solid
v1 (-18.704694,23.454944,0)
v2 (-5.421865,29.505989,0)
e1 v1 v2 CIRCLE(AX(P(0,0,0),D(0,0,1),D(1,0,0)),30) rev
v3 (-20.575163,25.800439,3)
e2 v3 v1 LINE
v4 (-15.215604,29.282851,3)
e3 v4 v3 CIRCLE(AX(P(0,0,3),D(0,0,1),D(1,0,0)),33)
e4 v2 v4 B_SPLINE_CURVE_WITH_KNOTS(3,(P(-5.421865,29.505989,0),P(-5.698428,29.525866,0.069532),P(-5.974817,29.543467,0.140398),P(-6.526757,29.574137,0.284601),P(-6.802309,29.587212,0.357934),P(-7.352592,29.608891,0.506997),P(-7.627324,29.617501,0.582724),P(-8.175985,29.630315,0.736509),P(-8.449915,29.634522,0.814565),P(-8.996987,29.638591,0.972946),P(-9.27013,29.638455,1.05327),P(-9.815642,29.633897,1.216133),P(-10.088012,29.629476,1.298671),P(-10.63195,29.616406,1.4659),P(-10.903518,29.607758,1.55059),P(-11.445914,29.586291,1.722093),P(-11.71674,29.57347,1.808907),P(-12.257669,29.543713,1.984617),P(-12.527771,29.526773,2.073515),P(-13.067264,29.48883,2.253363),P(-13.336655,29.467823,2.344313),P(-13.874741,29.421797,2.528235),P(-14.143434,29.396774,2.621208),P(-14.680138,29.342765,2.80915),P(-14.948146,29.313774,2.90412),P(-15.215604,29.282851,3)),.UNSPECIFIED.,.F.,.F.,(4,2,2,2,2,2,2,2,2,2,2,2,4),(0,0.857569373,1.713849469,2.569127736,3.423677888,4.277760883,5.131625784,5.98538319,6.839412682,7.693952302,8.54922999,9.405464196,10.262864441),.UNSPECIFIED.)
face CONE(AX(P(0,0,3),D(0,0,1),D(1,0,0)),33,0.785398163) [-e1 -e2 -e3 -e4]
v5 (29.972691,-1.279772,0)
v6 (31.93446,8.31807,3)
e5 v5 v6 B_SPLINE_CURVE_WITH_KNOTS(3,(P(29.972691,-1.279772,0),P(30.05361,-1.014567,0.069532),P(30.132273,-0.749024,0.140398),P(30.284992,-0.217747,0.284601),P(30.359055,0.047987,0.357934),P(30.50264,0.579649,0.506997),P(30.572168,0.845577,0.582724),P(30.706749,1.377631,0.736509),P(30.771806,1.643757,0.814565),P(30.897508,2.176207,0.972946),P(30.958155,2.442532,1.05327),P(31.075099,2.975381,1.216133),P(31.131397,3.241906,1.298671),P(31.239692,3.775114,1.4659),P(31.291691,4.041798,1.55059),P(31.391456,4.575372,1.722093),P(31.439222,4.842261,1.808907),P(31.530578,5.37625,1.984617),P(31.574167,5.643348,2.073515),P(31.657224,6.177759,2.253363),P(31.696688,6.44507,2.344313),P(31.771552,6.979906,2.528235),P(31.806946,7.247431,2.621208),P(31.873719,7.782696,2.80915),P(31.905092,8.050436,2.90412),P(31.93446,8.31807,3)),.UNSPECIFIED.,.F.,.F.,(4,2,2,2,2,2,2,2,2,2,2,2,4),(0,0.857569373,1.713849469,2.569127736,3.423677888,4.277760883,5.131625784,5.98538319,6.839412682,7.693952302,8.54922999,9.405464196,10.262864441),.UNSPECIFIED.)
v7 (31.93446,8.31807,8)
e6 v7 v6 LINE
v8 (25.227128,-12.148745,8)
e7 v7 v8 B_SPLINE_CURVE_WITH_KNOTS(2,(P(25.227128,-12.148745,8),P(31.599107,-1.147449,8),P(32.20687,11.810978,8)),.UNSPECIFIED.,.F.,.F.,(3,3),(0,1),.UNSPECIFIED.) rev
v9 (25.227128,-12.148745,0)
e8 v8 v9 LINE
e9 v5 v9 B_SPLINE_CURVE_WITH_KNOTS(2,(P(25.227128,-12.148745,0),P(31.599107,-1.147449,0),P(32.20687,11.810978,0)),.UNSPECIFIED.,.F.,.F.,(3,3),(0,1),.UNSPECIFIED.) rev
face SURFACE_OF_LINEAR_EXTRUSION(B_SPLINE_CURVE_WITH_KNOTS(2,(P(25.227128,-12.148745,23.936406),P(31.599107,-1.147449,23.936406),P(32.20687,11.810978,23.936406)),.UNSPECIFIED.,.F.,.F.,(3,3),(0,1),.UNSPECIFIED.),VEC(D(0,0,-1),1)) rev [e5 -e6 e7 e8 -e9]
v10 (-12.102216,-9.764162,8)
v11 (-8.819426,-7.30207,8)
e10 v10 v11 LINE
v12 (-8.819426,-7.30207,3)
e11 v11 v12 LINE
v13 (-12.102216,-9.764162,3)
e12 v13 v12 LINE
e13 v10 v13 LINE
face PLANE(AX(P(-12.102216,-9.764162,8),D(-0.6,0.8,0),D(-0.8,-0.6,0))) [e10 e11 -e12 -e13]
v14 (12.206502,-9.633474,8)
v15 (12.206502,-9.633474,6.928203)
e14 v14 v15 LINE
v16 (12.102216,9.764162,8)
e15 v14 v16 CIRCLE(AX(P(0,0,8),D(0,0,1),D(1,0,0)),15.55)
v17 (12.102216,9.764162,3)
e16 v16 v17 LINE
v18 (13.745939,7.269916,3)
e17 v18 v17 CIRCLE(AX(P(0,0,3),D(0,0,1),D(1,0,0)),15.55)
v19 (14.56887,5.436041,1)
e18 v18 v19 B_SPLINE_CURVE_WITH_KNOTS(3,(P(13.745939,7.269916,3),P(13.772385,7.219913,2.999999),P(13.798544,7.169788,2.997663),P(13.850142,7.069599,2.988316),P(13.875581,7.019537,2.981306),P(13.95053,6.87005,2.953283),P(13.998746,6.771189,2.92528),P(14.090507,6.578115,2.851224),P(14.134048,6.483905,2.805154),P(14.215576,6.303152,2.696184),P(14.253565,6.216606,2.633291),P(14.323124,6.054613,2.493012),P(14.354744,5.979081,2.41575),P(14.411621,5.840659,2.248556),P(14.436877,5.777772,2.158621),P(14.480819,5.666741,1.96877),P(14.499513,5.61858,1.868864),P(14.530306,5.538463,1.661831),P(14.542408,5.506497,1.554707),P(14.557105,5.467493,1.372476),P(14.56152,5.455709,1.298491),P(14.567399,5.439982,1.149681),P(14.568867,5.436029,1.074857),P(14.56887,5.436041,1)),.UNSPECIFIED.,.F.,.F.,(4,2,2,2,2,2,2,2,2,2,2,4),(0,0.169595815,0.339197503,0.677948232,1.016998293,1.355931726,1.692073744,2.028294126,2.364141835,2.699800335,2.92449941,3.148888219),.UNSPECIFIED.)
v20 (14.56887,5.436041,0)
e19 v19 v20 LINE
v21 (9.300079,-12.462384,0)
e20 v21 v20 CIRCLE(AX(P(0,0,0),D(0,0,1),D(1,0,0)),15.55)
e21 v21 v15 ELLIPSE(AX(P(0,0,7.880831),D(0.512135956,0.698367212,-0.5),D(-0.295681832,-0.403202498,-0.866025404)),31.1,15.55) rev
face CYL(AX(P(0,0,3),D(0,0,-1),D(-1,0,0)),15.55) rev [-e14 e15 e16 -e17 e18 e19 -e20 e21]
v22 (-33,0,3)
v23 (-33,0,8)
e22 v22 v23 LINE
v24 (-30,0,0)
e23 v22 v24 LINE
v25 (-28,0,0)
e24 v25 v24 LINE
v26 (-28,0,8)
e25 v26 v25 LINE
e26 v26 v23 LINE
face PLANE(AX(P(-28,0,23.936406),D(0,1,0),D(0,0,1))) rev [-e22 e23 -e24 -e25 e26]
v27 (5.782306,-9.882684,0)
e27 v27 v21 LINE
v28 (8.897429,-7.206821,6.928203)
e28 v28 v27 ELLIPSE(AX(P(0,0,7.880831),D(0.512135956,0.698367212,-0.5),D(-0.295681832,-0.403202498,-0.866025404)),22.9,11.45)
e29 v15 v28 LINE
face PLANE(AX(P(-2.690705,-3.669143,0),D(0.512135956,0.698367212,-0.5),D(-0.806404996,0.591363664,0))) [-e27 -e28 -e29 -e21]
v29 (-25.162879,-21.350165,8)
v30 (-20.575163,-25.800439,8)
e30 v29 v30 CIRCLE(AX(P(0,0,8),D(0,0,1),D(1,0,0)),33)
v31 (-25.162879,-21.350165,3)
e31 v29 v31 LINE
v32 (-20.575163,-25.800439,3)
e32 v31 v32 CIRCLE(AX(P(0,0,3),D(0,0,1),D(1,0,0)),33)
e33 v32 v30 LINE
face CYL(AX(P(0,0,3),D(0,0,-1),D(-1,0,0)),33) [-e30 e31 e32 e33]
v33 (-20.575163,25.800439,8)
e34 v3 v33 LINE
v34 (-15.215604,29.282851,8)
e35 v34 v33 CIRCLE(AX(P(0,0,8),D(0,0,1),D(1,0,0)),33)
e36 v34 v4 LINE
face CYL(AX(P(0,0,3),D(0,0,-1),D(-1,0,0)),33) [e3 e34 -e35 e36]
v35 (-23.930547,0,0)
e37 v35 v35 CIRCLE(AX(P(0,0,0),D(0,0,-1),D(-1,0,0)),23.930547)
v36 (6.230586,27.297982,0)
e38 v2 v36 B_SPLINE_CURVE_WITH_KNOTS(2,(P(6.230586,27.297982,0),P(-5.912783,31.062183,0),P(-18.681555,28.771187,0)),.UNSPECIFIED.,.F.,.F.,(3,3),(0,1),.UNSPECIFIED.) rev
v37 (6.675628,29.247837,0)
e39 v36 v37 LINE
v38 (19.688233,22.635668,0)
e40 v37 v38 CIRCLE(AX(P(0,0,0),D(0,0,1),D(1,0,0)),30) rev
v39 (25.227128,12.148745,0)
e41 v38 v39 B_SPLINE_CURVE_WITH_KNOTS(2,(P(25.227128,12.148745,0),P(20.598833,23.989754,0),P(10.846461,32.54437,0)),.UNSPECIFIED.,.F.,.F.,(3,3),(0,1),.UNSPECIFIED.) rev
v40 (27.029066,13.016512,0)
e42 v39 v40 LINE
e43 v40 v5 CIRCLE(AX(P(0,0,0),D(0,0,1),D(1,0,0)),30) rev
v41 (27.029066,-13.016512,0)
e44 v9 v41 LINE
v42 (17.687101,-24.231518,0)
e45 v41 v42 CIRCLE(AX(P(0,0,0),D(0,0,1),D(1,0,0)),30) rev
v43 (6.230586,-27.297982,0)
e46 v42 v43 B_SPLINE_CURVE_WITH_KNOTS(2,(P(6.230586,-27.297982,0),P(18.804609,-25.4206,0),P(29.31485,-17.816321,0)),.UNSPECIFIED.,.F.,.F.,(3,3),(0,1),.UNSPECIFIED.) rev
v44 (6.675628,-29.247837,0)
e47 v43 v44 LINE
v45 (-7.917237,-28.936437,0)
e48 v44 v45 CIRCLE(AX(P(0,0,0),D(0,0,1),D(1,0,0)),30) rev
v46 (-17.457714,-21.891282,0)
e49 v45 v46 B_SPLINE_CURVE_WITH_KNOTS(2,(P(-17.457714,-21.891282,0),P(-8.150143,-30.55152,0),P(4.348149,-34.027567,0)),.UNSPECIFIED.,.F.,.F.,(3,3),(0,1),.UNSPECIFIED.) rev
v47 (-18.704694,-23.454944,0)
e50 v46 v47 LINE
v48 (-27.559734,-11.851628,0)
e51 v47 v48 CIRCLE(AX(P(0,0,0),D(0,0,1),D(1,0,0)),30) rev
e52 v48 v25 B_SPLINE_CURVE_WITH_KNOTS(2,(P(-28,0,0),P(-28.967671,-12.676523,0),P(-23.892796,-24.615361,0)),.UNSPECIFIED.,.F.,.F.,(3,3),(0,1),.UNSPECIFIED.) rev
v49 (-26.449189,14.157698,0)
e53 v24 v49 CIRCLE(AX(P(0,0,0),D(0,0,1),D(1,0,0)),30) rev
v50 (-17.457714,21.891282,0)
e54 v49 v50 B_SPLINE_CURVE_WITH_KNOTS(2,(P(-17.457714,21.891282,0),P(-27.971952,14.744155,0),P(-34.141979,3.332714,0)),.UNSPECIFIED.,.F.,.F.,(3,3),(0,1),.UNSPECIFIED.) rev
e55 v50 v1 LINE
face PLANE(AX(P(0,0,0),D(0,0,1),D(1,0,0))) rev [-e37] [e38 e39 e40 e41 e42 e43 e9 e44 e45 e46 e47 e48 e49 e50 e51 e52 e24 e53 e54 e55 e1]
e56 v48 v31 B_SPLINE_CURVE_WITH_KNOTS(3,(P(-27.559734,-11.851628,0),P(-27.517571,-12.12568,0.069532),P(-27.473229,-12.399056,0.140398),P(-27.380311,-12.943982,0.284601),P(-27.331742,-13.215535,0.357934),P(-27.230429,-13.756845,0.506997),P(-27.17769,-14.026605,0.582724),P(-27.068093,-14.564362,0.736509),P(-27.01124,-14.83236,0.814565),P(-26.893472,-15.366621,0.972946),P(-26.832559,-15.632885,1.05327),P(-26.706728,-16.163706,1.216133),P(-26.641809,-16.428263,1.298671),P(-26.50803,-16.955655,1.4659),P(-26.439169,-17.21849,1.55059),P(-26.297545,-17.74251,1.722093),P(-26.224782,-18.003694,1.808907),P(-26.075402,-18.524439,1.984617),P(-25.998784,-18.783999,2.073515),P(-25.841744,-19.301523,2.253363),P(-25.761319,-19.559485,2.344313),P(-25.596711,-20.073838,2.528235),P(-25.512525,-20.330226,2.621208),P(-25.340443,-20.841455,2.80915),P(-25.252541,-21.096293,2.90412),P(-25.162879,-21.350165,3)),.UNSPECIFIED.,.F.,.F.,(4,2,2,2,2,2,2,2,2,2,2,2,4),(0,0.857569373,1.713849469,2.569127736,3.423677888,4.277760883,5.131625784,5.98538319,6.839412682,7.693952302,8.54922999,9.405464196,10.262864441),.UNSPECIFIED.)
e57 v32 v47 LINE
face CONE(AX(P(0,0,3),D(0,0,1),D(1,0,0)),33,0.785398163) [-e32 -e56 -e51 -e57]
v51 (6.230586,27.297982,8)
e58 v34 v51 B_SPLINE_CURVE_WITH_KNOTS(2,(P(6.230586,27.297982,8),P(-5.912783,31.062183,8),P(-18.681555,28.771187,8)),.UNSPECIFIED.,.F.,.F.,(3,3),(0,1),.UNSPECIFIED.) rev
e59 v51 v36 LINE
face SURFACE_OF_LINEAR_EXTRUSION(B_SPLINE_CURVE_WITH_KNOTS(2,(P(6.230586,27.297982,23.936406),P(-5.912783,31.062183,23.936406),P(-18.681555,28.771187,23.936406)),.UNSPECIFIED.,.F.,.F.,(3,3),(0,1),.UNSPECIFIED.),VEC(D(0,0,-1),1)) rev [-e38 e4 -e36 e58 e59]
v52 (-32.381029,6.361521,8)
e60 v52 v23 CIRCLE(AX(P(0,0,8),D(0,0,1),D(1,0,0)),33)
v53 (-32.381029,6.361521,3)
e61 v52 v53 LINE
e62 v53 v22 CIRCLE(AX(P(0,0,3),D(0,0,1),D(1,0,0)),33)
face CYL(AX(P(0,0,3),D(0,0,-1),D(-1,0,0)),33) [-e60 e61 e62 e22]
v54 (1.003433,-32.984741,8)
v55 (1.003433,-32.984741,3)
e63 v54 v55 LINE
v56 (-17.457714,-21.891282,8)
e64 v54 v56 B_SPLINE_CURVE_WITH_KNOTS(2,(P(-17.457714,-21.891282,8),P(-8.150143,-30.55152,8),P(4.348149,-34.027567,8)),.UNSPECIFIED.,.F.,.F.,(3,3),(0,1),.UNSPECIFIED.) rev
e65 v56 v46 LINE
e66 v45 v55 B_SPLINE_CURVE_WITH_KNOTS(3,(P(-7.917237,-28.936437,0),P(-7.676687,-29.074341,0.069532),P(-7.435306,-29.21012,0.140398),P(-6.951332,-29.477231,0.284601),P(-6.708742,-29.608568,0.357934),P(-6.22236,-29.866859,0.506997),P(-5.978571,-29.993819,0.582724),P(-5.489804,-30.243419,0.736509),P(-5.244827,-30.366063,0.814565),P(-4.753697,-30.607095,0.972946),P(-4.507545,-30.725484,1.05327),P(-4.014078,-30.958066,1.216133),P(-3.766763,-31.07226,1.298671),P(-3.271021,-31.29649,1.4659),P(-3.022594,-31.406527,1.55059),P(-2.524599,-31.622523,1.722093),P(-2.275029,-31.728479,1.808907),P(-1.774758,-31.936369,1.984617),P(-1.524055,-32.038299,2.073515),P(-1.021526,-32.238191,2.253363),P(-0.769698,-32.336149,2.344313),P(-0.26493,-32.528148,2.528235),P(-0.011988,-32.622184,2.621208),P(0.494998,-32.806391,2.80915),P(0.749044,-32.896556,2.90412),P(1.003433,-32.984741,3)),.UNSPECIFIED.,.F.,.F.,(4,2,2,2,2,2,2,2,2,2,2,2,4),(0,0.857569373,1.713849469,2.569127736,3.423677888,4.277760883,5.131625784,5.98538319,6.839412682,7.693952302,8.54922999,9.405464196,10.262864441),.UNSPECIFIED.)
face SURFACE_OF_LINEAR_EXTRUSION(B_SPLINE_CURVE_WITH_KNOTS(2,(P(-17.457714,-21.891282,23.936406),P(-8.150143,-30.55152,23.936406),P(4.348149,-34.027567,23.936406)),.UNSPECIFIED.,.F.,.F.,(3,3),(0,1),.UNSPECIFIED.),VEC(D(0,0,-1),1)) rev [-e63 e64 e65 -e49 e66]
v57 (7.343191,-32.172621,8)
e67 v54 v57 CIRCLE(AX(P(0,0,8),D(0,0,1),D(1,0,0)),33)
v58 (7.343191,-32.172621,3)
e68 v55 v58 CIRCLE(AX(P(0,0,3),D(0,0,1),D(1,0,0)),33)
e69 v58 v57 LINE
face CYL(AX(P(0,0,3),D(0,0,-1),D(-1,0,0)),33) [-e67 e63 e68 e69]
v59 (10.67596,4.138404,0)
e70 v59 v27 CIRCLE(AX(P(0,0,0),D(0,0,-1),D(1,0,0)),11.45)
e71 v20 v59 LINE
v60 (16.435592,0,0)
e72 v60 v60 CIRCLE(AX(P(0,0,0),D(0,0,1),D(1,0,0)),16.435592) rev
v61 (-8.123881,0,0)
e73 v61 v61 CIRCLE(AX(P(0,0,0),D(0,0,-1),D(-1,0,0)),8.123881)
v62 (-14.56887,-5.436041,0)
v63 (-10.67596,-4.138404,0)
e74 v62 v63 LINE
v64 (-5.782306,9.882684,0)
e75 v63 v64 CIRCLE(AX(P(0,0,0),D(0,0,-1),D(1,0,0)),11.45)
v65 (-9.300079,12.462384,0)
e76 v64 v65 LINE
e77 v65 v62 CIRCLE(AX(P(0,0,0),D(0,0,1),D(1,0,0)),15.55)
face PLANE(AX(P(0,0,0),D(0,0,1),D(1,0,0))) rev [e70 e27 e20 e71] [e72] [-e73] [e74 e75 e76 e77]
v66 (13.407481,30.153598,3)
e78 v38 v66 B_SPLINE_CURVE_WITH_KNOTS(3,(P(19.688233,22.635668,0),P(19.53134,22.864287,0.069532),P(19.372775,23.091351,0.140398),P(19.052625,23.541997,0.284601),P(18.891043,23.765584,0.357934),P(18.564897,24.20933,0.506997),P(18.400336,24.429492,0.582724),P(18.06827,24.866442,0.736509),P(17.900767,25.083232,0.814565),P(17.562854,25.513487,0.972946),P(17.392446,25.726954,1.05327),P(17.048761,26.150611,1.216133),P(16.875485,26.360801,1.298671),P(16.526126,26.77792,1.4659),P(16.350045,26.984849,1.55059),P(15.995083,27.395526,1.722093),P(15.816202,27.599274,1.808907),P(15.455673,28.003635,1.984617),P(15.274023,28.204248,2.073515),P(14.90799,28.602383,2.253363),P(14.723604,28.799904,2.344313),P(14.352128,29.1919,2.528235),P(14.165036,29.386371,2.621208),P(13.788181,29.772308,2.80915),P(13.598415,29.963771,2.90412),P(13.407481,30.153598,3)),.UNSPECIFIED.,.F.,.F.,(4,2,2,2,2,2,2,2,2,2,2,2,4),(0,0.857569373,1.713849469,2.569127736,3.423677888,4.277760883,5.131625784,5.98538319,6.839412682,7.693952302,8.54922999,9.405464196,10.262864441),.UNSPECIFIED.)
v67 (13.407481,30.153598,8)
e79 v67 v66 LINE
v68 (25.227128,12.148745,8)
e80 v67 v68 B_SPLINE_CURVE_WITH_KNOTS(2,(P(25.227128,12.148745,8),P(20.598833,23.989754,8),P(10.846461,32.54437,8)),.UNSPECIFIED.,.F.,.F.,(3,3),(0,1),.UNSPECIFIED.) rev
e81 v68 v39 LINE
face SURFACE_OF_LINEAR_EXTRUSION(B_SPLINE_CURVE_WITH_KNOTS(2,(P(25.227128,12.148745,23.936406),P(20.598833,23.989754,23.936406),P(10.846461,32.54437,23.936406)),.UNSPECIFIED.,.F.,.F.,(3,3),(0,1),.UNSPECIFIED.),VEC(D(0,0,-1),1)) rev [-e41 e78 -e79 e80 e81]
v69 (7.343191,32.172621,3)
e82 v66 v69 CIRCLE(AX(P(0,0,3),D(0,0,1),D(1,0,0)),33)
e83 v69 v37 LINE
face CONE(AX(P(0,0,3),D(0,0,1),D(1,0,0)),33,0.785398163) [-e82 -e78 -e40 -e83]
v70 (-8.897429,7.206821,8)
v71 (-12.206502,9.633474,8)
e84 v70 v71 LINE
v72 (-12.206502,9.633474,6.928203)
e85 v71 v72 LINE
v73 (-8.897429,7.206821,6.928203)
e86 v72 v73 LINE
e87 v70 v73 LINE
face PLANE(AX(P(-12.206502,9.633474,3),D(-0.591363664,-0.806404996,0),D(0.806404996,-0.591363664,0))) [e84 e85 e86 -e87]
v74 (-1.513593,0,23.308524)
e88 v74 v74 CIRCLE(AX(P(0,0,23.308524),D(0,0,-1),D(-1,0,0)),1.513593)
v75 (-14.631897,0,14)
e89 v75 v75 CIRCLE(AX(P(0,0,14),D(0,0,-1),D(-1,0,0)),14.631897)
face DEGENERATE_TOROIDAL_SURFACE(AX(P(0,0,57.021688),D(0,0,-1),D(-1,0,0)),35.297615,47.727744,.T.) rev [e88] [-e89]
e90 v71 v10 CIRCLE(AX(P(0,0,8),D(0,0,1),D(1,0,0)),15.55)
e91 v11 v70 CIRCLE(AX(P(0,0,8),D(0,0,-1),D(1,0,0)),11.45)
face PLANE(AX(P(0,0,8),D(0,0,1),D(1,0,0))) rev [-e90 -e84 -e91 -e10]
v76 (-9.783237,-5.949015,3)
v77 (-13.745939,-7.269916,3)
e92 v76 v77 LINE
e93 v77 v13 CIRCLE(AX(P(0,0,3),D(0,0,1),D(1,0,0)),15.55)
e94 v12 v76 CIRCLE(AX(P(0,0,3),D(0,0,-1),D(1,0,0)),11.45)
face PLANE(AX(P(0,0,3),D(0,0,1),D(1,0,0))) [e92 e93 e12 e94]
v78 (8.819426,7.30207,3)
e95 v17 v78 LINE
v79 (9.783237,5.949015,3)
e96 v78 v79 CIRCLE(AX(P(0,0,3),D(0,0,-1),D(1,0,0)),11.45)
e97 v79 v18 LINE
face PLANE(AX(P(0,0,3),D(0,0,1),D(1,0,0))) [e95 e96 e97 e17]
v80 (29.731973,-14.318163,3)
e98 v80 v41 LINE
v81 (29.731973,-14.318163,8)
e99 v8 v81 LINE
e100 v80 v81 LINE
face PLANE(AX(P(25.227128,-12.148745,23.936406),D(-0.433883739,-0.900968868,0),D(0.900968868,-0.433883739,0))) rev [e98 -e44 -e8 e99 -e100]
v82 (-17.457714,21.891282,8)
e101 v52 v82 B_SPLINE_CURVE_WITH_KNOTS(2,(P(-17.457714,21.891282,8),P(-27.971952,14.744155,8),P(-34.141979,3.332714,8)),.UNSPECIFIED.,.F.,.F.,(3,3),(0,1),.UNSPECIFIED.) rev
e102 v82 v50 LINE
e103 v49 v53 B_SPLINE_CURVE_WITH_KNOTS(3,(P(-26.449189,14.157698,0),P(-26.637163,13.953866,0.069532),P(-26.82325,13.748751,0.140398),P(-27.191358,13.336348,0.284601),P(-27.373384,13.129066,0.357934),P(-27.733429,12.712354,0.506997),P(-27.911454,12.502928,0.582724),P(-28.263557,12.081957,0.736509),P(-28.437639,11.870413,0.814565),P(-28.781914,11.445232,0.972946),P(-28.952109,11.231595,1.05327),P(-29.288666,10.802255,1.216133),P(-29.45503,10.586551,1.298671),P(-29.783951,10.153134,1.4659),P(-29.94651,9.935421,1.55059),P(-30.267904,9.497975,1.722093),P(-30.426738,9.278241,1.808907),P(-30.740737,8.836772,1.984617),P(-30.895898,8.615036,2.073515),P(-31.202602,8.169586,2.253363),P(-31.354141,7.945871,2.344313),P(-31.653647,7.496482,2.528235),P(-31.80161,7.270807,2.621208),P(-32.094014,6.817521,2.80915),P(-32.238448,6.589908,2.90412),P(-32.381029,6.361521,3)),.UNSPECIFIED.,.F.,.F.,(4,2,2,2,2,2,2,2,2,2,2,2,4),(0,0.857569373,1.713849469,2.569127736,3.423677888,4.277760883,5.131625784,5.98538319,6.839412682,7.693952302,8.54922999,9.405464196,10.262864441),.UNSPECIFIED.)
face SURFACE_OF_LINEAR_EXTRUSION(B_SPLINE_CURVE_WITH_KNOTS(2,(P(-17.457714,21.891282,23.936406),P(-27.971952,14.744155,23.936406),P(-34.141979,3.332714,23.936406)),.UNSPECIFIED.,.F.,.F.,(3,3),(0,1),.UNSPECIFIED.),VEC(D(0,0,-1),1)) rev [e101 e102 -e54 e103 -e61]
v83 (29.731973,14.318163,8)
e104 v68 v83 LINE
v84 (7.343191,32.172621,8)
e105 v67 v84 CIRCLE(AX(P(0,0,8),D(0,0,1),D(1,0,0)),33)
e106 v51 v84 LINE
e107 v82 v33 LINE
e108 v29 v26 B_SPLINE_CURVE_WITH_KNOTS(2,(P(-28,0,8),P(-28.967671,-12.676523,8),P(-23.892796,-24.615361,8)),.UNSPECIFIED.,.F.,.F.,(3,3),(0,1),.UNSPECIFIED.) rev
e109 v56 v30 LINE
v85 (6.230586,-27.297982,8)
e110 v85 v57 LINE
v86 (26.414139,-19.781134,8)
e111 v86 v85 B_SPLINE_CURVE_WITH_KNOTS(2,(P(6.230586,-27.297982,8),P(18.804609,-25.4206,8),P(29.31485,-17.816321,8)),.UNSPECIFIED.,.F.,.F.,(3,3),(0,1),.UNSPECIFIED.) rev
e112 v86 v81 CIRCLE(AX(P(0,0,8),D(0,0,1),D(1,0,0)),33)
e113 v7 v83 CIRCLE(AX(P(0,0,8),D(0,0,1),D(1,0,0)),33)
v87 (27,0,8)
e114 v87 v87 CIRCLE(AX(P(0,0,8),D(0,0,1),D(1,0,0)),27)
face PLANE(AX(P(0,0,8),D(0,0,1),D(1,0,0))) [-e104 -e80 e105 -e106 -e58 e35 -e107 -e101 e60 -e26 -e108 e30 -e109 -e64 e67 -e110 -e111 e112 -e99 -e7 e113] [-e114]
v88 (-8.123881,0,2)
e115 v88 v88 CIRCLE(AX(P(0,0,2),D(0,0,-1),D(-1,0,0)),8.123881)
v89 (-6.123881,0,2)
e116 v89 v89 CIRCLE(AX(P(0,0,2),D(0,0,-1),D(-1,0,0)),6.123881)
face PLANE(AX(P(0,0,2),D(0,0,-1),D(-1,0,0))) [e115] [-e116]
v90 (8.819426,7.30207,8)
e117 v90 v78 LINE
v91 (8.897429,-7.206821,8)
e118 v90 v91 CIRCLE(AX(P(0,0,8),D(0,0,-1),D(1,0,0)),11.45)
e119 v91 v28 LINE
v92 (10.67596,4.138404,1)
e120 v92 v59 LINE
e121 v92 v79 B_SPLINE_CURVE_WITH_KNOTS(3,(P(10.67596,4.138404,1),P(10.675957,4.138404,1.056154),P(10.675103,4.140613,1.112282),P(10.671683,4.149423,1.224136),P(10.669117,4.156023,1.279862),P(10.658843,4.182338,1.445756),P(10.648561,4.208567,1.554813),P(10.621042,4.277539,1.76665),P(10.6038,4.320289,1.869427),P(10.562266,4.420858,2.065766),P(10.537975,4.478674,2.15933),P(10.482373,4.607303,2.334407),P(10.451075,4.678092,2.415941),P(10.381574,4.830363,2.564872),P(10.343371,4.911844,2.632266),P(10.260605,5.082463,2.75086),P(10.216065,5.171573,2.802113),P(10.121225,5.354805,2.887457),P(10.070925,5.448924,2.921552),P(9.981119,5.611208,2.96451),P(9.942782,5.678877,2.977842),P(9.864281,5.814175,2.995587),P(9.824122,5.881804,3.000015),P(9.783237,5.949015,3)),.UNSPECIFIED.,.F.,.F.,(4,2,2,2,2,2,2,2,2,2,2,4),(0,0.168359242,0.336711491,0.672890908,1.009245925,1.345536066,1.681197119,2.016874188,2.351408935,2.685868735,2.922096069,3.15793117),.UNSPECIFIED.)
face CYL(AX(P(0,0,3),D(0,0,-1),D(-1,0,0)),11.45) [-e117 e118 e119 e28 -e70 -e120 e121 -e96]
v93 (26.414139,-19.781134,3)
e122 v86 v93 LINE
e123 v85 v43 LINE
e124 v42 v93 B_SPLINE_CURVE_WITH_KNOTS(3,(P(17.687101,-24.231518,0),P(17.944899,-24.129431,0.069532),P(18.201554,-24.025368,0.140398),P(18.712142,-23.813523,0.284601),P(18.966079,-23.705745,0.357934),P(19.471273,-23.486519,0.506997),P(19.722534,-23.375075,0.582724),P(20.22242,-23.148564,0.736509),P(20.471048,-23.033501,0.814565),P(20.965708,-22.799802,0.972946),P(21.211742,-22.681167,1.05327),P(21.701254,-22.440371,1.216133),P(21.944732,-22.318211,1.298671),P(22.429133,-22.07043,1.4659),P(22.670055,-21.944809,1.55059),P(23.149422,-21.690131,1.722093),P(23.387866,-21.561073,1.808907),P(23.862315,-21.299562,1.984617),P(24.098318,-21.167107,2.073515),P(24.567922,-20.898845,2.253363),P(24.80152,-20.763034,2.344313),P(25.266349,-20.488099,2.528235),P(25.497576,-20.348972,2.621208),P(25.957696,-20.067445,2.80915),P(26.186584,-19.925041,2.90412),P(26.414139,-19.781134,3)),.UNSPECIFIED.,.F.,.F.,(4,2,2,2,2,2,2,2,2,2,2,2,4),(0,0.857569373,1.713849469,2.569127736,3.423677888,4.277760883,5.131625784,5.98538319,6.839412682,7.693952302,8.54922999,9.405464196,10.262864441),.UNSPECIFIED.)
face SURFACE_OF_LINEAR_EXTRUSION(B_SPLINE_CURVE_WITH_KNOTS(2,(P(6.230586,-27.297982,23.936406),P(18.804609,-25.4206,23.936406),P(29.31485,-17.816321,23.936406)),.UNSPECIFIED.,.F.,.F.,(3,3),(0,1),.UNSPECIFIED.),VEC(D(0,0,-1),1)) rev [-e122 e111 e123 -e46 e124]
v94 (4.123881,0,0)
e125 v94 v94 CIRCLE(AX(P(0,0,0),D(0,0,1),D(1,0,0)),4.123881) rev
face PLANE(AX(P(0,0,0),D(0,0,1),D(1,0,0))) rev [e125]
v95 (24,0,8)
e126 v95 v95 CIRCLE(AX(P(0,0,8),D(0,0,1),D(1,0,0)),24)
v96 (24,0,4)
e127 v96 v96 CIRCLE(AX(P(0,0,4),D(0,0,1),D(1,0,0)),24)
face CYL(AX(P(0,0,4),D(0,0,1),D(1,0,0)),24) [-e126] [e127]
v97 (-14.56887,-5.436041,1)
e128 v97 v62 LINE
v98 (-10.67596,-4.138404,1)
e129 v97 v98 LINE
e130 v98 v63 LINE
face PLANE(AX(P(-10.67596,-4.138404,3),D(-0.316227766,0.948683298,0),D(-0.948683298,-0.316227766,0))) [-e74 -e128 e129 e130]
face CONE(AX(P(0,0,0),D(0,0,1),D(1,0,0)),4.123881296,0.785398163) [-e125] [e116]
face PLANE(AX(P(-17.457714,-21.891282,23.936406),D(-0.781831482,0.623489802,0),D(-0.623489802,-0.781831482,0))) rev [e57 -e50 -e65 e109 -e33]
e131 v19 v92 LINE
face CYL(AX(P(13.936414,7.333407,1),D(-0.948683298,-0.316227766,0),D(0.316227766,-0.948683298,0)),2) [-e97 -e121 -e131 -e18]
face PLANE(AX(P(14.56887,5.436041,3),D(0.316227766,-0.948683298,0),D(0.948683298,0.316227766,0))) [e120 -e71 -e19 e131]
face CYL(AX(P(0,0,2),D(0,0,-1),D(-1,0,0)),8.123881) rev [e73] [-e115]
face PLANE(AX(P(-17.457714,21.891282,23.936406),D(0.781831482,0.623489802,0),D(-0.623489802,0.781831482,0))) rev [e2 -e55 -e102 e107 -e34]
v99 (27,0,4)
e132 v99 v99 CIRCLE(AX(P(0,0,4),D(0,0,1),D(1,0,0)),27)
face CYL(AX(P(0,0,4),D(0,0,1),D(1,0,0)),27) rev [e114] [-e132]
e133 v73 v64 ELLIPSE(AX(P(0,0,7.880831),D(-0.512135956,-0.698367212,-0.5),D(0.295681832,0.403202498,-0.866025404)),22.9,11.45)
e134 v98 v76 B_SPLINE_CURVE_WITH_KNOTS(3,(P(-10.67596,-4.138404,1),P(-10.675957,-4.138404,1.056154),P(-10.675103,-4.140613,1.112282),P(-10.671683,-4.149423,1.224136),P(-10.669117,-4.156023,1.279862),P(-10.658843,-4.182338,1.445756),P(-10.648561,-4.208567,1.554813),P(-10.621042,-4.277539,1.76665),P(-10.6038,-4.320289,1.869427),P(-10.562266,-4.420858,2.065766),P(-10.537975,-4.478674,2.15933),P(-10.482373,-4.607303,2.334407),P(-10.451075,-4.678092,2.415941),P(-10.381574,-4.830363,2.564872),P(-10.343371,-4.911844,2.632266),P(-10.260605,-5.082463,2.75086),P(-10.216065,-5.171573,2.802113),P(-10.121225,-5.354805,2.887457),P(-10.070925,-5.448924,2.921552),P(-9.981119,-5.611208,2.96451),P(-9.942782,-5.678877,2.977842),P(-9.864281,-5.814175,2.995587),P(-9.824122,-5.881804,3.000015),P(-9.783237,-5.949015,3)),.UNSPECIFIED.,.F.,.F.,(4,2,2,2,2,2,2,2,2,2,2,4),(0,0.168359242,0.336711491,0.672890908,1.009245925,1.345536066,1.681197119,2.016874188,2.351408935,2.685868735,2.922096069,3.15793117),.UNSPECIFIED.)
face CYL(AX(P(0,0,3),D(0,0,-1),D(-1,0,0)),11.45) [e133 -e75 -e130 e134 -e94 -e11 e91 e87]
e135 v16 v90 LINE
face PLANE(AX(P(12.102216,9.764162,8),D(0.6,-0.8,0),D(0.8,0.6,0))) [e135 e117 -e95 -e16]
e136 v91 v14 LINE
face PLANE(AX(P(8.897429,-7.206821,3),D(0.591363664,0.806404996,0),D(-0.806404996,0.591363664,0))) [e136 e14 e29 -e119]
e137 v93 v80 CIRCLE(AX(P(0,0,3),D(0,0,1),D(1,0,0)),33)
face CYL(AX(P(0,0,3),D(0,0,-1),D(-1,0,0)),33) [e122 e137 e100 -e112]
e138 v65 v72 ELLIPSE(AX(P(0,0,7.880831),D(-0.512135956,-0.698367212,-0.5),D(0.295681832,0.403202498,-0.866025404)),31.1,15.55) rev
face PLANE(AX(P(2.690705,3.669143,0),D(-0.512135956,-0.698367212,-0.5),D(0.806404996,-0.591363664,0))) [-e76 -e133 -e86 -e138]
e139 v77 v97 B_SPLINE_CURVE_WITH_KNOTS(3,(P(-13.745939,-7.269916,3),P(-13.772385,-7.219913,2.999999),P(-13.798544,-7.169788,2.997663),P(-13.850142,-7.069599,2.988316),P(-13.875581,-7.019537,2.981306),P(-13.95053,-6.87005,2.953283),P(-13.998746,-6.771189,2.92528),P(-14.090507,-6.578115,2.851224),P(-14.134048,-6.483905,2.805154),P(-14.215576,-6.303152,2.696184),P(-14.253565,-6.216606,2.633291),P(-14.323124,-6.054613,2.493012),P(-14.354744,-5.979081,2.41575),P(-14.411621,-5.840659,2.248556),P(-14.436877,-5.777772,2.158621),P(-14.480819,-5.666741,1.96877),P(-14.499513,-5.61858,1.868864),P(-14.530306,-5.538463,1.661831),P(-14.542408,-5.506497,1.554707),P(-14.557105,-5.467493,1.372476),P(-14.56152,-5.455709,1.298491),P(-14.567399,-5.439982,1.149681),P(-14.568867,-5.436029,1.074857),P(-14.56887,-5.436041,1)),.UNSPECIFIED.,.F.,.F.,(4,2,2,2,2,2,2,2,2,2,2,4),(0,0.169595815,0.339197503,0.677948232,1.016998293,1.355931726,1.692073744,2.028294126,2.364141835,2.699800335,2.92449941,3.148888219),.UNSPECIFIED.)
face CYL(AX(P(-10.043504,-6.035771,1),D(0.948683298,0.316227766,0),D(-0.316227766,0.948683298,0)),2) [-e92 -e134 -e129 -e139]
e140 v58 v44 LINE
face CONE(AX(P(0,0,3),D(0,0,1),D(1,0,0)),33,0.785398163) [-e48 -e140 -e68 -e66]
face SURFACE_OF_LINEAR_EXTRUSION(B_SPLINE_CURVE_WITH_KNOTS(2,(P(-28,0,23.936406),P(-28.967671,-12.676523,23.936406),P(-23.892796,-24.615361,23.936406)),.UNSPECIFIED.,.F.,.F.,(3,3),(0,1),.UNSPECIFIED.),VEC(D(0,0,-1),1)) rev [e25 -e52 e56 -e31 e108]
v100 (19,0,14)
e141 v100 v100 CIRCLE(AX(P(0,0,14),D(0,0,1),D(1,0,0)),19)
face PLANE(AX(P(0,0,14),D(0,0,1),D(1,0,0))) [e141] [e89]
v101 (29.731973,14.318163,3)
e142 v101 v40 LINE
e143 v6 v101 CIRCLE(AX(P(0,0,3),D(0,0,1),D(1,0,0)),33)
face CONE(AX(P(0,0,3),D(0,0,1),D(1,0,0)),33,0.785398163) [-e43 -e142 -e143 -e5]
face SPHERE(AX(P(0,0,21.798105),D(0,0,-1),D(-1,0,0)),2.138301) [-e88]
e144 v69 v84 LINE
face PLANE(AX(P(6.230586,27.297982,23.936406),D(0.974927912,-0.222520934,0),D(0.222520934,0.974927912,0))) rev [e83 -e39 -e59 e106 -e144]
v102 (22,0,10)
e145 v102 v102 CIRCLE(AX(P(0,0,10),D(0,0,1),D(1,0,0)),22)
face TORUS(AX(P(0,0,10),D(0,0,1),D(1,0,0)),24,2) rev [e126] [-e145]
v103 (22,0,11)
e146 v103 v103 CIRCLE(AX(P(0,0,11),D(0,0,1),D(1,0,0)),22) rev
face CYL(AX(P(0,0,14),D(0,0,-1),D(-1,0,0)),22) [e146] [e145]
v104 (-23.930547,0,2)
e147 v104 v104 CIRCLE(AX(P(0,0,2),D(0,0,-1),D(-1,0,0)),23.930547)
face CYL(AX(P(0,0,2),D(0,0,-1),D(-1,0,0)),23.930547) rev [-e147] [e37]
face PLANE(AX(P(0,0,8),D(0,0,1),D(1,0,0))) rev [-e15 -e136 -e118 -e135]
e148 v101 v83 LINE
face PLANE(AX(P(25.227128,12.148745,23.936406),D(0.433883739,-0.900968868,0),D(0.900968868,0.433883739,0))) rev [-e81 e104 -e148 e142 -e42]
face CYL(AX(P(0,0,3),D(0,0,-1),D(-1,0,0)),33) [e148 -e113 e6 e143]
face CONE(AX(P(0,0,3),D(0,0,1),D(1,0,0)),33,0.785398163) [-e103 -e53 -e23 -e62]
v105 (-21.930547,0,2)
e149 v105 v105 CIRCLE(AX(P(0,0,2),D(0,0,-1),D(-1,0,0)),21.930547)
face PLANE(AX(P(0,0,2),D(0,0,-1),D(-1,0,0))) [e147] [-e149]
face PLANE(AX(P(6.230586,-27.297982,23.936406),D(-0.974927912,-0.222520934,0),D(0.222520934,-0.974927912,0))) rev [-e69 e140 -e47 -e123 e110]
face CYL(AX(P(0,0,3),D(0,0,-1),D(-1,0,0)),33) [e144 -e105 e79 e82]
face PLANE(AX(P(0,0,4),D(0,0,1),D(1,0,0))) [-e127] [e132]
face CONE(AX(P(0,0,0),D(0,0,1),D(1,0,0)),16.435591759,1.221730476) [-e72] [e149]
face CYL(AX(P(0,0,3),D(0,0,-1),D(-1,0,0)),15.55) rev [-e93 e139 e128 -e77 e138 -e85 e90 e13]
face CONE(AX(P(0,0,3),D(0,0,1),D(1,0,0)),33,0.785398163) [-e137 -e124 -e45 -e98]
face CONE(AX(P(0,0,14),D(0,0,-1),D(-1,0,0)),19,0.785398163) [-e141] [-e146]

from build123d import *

# Parameters (mm, degrees)
ESQUISSE1_R                     = 33
BOSS_EXTRU_1_DEPTH              = 3
ESQUISSE2_R                     = 33
BOSS_EXTRU_2_DEPTH              = 5
CONG_1_R                        = 2
ESQUISSE3_R                     = 22
BOSS_EXTRU_3_DEPTH              = 6
CHANFREIN1_SIZE                 = 3
CONG_2_R                        = 2
CHANFREIN2_SIZE                 = 3
ESQUISSE5_R                     = 27.000000000000004
ESQUISSE5_R_2                   = 24.000000000000004
ENL_V_DE_MAT_EXTRU_MINCE1_DEPTH = 4
ENL_V_MAT_EXTRU_1_DEPTH         = 53.44951392438422
ENL_V_MAT_EXTRU_1_DEPTH_BACK    = 53.44951392438422
ESQUISSE7_R                     = 23.930546597488352
ESQUISSE7_R_2                   = 21.930546597488352
ESQUISSE7_R_3                   = 8.12388129582667
ESQUISSE7_R_4                   = 6.123881295826671
ENL_V_DE_MAT_EXTRU_MINCE2_DEPTH = 2
CHANFREIN3_SIZE                 = 2
CHANFREIN4_SIZE2                = 2
CHANFREIN4_SIZE                 = 5.494954839
CHANFREIN5_SIZE                 = 4
CHANFREIN5_SIZE2                = 6.928203230275547
CHANFREIN6_SIZE                 = 4
CHANFREIN6_SIZE2                = 6.928203230275547


with BuildPart() as part:
    # Esquisse1 → Boss.-Extru.1 (new body)
    with BuildSketch(Plane.XY):
        Circle(ESQUISSE1_R)
        with BuildLine():
            Line((-10.675959520705847, -4.138404077932739), (-14.568869579057516, -5.436040764049933))
            ThreePointArc((-14.568869579057516, -5.436040764049933), (-15.362379148266376, 2.4082788262388735), (-12.206501566003407, 9.633473907119715))
            Line((-12.206501566003407, 9.633473907119715), (-8.89742874273069, 7.206820503386352))
            ThreePointArc((-8.89742874273069, 7.206820503386352), (-11.311848311745987, 1.773298556941165), (-10.675959520705847, -4.138404077932739))
        make_face(mode=Mode.SUBTRACT)
        with BuildLine():
            Line((14.568869579057514, 5.436040764049934), (10.675959520705844, 4.138404077932738))
            ThreePointArc((10.675959520705844, 4.138404077932738), (11.311848311745983, -1.7732985569411592), (8.897428742730693, -7.206820503386345))
            Line((8.897428742730693, -7.206820503386345), (12.206501566003409, -9.633473907119711))
            ThreePointArc((12.206501566003409, -9.633473907119711), (15.362379148266374, -2.4082788262388677), (14.568869579057514, 5.436040764049934))
        make_face(mode=Mode.SUBTRACT)
    extrude(amount=BOSS_EXTRU_1_DEPTH)

    # Esquisse2 → Boss.-Extru.2 (add)
    with BuildSketch(Plane.XY.offset(3)):
        Circle(ESQUISSE2_R)
        with BuildLine():
            Line((-12.102216214336107, -9.764162160751955), (-8.819426211517364, -7.302069658637931))
            ThreePointArc((-8.819426211517364, -7.302069658637931), (-11.449834531594213, -0.061556470926751), (-8.897428742730693, 7.206820503386354))
            Line((-8.897428742730693, 7.206820503386354), (-12.206501566003409, 9.633473907119713))
            ThreePointArc((-12.206501566003409, 9.633473907119713), (-15.549775280898679, -0.08359852601843287), (-12.102216214336107, -9.764162160751955))
        make_face(mode=Mode.SUBTRACT)
        with BuildLine():
            Line((12.102216214336359, 9.76416216075164), (8.819426211517387, 7.302069658637905))
            ThreePointArc((8.819426211517387, 7.302069658637905), (11.449834531594213, 0.06155647092658078), (8.897428742730495, -7.206820503386595))
            Line((8.897428742730495, -7.206820503386595), (12.206501566003364, -9.63347390711977))
            ThreePointArc((12.206501566003364, -9.63347390711977), (15.54977528089868, 0.0835985260181948), (12.102216214336359, 9.76416216075164))
        make_face(mode=Mode.SUBTRACT)
    extrude(amount=BOSS_EXTRU_2_DEPTH)

    # Congé1
    cong_1_edges = [part.edges().sort_by_distance(p)[0] for p in [
        (-12.622414549881682, -4.787222420991336, 3),
        (12.622414549881679, 4.787222420991336, 3),
    ]]
    fillet(cong_1_edges, radius=CONG_1_R)

    # Esquisse3 → Boss.-Extru.3 (add)
    with BuildSketch(Plane.XY.offset(8)):
        Circle(ESQUISSE3_R)
    extrude(amount=BOSS_EXTRU_3_DEPTH)

    # Esquisse4 → Révolution3 (revolve)
    with BuildSketch(Plane(origin=(0, 0, 0), x_dir=(1, 0, 0), z_dir=(0, 1, 0))):
        with BuildLine():
            Line((0, -13.999999999999998), (0, -23.936405555224336))
            ThreePointArc((0, -23.936405555224336), (-0.8193291269458294, -23.773207312008758), (-1.5135934632740111, -23.308523638793037))
            ThreePointArc((-1.5135934632740111, -23.308523638793037), (-7.677772539936917, -18.09763553075605), (-14.631896612797249, -14))
            Line((-14.631896612797249, -14), (0, -13.999999999999998))
        make_face()
    revolve(axis=Axis((0, 0, 13.999999999999998), (0, 0, 1)))

    # Chanfrein1
    chanfrein1_edges = [part.edges().sort_by_distance(p)[0] for p in [
        (-33, 4.04e-15, 0),
    ]]
    chamfer(chanfrein1_edges, length=CHANFREIN1_SIZE)

    # Congé2
    cong_2_edges = [part.edges().sort_by_distance(p)[0] for p in [
        (-22, 1.246e-14, 8),
    ]]
    fillet(cong_2_edges, radius=CONG_2_R)

    # Chanfrein2
    chanfrein2_edges = [part.edges().sort_by_distance(p)[0] for p in [
        (-22, 1.246e-14, 14),
    ]]
    chamfer(chanfrein2_edges, length=CHANFREIN2_SIZE)

    # Esquisse5 → Enlèv. de mat.-Extru.-Mince1 (cut)
    with BuildSketch(Plane.XY.offset(8)):
        Circle(ESQUISSE5_R)
        Circle(ESQUISSE5_R_2, mode=Mode.SUBTRACT)
    extrude(amount=-ENL_V_DE_MAT_EXTRU_MINCE1_DEPTH, mode=Mode.SUBTRACT)

    # Esquisse6 → Enlèv. mat.-Extru.1 (cut, two sides: drawn at the far end of the back side and taken through both)
    with BuildSketch(Plane(origin=(0, 0, 0), x_dir=(-1, 0, 0), z_dir=(0, 0, -1)).offset(-ENL_V_MAT_EXTRU_1_DEPTH_BACK)):
        with BuildLine():
            Line((17.457714452044502, -21.891281509104868), (21.744690267234997, -27.266979149873006))
            Line((21.744690267234997, -27.266979149873006), (10.757517205682898, -34.42702004009948))
            Line((10.757517205682898, -34.42702004009948), (-4.348149134028366, -34.02756682996412))
            add(Edge.make_bspline(
                [(17.457714452044502, -21.891281509104868), (8.150142920234186, -30.55152022572505), (-4.348149134028366, -34.02756682996412)],
                knots=[0, 0, 0, 1, 1, 1], degree=2))
        make_face()
        with BuildLine():
            Line((28, 0), (34.87577535736795, 0))
            Line((34.87577535736795, 0), (33.62333038597071, -13.05433027879381))
            Line((33.62333038597071, -13.05433027879381), (23.89279637742328, -24.61536078399858))
            add(Edge.make_bspline(
                [(28, 0), (28.967671344187806, -12.676522970367387), (23.89279637742328, -24.61536078399858)],
                knots=[0, 0, 0, 1, 1, 1], degree=2))
        make_face()
        with BuildLine():
            Line((-6.230586150776911, -27.29798154109103), (-7.760590104972264, -34.00136685488099))
            Line((-7.760590104972264, -34.00136685488099), (-20.208925843844458, -29.875461527982615))
            Line((-20.208925843844458, -29.875461527982615), (-29.314849661478412, -17.816321017099597))
            add(Edge.make_bspline(
                [(-6.230586150776911, -27.29798154109103), (-18.80460935527342, -25.420599613673357), (-29.314849661478412, -17.816321017099597)],
                knots=[0, 0, 0, 1, 1, 1], degree=2))
        make_face()
        with BuildLine():
            Line((-25.22712830126781, -12.148744695291473), (-31.421987840946983, -15.132031816678607))
            Line((-31.421987840946983, -15.132031816678607), (-35.95763554599567, -2.827071136940631))
            Line((-35.95763554599567, -2.827071136940631), (-32.20687047987901, 11.810977908358138))
            add(Edge.make_bspline(
                [(-25.22712830126781, -12.148744695291473), (-31.59910724213477, -1.1474490067937917), (-32.20687047987901, 11.810977908358138)],
                knots=[0, 0, 0, 1, 1, 1], degree=2))
        make_face()
        with BuildLine():
            Line((-25.22712830126764, 12.148744695291825), (-31.42198784094677, 15.132031816679044))
            Line((-31.42198784094677, 15.132031816679044), (-24.629512279918224, 26.350161481959308))
            Line((-24.629512279918224, 26.350161481959308), (-10.846460926500809, 32.54436956877975))
            add(Edge.make_bspline(
                [(-25.22712830126764, 12.148744695291825), (-20.598832871349522, 23.98975410589561), (-10.846460926500809, 32.54436956877975)],
                knots=[0, 0, 0, 1, 1, 1], degree=2))
        make_face()
        with BuildLine():
            Line((-6.230586150776541, 27.297981541091115), (-7.760590104971805, 34.00136685488109))
            Line((-7.760590104971805, 34.00136685488109), (5.245136083428826, 35.68518505960543))
            Line((5.245136083428826, 35.68518505960543), (18.68155493201407, 28.77118715975353))
            add(Edge.make_bspline(
                [(-6.230586150776541, 27.297981541091115), (5.9127827911769995, 31.062183075042935), (18.68155493201407, 28.77118715975353)],
                knots=[0, 0, 0, 1, 1, 1], degree=2))
        make_face()
        with BuildLine():
            Line((17.457714452044808, 21.891281509104626), (21.74469026723538, 27.266979149872704))
            Line((21.74469026723538, 27.266979149872704), (31.17008999467649, 18.148536442251835))
            Line((31.17008999467649, 18.148536442251835), (34.14197889244976, 3.3327139941706876))
            add(Edge.make_bspline(
                [(17.457714452044808, 21.891281509104626), (27.971952413158835, 14.744154635620854), (34.14197889244976, 3.3327139941706876)],
                knots=[0, 0, 0, 1, 1, 1], degree=2))
        make_face()
    extrude(amount=ENL_V_MAT_EXTRU_1_DEPTH + ENL_V_MAT_EXTRU_1_DEPTH_BACK, mode=Mode.SUBTRACT)

    # Esquisse7 → Enlèv. de mat.-Extru.-Mince2 (cut)
    # profile 1 of 2: a face of its own
    with BuildSketch(Plane(origin=(0, 0, 0), x_dir=(-1, 0, 0), z_dir=(0, 0, -1))):
        Circle(ESQUISSE7_R)
        Circle(ESQUISSE7_R_2, mode=Mode.SUBTRACT)
    # profile 2 of 2: a face of its own
    with BuildSketch(Plane(origin=(0, 0, 0), x_dir=(-1, 0, 0), z_dir=(0, 0, -1))):
        Circle(ESQUISSE7_R_3)
        Circle(ESQUISSE7_R_4, mode=Mode.SUBTRACT)
    extrude(amount=-ENL_V_DE_MAT_EXTRU_MINCE2_DEPTH, mode=Mode.SUBTRACT)

    # Chanfrein3
    chanfrein3_edges = [part.edges().sort_by_distance(p)[0] for p in [
        (6.123881295826671, 7.5e-16, 0),
    ]]
    chamfer(chanfrein3_edges, length=CHANFREIN3_SIZE - 0.0001)  # a hair under: the kernel refuses the full size

    # Chanfrein4
    chanfrein4_edges = [part.edges().sort_by_distance(p)[0] for p in [
        (21.930546597488352, 2.69e-15, 0),
    ]]
    chanfrein4_side = [part.faces().sort_by_distance(p)[0] for p in [
        (21.890546597488353, 2.68e-15, 0),
    ]]
    chamfer(chanfrein4_edges, length=CHANFREIN4_SIZE - 0.0001, length2=CHANFREIN4_SIZE2 - 0.0001, reference=chanfrein4_side[0])  # a hair under: the kernel refuses the full size

    # Chanfrein5
    chanfrein5_edges = [part.edges().sort_by_distance(p)[0] for p in [
        (10.551965154367052, -8.420147205253029, 0),
    ]]
    chanfrein5_side = [part.faces().sort_by_distance(p)[0] for p in [
        (15.970820194651594, 1.96e-15, 0),
    ]]
    chamfer(chanfrein5_edges, length=CHANFREIN5_SIZE, length2=CHANFREIN5_SIZE2, reference=chanfrein5_side[0])

    # Chanfrein6
    chanfrein6_edges = [part.edges().sort_by_distance(p)[0] for p in [
        (-10.55196515436705, 8.420147205253034, 0),
    ]]
    chanfrein6_side = [part.faces().sort_by_distance(p)[0] for p in [
        (10.37156741301878, -3.6198944951765126, 0),
    ]]
    chamfer(chanfrein6_edges, length=CHANFREIN6_SIZE, length2=CHANFREIN6_SIZE2, reference=chanfrein6_side[0])


solid = part.part
